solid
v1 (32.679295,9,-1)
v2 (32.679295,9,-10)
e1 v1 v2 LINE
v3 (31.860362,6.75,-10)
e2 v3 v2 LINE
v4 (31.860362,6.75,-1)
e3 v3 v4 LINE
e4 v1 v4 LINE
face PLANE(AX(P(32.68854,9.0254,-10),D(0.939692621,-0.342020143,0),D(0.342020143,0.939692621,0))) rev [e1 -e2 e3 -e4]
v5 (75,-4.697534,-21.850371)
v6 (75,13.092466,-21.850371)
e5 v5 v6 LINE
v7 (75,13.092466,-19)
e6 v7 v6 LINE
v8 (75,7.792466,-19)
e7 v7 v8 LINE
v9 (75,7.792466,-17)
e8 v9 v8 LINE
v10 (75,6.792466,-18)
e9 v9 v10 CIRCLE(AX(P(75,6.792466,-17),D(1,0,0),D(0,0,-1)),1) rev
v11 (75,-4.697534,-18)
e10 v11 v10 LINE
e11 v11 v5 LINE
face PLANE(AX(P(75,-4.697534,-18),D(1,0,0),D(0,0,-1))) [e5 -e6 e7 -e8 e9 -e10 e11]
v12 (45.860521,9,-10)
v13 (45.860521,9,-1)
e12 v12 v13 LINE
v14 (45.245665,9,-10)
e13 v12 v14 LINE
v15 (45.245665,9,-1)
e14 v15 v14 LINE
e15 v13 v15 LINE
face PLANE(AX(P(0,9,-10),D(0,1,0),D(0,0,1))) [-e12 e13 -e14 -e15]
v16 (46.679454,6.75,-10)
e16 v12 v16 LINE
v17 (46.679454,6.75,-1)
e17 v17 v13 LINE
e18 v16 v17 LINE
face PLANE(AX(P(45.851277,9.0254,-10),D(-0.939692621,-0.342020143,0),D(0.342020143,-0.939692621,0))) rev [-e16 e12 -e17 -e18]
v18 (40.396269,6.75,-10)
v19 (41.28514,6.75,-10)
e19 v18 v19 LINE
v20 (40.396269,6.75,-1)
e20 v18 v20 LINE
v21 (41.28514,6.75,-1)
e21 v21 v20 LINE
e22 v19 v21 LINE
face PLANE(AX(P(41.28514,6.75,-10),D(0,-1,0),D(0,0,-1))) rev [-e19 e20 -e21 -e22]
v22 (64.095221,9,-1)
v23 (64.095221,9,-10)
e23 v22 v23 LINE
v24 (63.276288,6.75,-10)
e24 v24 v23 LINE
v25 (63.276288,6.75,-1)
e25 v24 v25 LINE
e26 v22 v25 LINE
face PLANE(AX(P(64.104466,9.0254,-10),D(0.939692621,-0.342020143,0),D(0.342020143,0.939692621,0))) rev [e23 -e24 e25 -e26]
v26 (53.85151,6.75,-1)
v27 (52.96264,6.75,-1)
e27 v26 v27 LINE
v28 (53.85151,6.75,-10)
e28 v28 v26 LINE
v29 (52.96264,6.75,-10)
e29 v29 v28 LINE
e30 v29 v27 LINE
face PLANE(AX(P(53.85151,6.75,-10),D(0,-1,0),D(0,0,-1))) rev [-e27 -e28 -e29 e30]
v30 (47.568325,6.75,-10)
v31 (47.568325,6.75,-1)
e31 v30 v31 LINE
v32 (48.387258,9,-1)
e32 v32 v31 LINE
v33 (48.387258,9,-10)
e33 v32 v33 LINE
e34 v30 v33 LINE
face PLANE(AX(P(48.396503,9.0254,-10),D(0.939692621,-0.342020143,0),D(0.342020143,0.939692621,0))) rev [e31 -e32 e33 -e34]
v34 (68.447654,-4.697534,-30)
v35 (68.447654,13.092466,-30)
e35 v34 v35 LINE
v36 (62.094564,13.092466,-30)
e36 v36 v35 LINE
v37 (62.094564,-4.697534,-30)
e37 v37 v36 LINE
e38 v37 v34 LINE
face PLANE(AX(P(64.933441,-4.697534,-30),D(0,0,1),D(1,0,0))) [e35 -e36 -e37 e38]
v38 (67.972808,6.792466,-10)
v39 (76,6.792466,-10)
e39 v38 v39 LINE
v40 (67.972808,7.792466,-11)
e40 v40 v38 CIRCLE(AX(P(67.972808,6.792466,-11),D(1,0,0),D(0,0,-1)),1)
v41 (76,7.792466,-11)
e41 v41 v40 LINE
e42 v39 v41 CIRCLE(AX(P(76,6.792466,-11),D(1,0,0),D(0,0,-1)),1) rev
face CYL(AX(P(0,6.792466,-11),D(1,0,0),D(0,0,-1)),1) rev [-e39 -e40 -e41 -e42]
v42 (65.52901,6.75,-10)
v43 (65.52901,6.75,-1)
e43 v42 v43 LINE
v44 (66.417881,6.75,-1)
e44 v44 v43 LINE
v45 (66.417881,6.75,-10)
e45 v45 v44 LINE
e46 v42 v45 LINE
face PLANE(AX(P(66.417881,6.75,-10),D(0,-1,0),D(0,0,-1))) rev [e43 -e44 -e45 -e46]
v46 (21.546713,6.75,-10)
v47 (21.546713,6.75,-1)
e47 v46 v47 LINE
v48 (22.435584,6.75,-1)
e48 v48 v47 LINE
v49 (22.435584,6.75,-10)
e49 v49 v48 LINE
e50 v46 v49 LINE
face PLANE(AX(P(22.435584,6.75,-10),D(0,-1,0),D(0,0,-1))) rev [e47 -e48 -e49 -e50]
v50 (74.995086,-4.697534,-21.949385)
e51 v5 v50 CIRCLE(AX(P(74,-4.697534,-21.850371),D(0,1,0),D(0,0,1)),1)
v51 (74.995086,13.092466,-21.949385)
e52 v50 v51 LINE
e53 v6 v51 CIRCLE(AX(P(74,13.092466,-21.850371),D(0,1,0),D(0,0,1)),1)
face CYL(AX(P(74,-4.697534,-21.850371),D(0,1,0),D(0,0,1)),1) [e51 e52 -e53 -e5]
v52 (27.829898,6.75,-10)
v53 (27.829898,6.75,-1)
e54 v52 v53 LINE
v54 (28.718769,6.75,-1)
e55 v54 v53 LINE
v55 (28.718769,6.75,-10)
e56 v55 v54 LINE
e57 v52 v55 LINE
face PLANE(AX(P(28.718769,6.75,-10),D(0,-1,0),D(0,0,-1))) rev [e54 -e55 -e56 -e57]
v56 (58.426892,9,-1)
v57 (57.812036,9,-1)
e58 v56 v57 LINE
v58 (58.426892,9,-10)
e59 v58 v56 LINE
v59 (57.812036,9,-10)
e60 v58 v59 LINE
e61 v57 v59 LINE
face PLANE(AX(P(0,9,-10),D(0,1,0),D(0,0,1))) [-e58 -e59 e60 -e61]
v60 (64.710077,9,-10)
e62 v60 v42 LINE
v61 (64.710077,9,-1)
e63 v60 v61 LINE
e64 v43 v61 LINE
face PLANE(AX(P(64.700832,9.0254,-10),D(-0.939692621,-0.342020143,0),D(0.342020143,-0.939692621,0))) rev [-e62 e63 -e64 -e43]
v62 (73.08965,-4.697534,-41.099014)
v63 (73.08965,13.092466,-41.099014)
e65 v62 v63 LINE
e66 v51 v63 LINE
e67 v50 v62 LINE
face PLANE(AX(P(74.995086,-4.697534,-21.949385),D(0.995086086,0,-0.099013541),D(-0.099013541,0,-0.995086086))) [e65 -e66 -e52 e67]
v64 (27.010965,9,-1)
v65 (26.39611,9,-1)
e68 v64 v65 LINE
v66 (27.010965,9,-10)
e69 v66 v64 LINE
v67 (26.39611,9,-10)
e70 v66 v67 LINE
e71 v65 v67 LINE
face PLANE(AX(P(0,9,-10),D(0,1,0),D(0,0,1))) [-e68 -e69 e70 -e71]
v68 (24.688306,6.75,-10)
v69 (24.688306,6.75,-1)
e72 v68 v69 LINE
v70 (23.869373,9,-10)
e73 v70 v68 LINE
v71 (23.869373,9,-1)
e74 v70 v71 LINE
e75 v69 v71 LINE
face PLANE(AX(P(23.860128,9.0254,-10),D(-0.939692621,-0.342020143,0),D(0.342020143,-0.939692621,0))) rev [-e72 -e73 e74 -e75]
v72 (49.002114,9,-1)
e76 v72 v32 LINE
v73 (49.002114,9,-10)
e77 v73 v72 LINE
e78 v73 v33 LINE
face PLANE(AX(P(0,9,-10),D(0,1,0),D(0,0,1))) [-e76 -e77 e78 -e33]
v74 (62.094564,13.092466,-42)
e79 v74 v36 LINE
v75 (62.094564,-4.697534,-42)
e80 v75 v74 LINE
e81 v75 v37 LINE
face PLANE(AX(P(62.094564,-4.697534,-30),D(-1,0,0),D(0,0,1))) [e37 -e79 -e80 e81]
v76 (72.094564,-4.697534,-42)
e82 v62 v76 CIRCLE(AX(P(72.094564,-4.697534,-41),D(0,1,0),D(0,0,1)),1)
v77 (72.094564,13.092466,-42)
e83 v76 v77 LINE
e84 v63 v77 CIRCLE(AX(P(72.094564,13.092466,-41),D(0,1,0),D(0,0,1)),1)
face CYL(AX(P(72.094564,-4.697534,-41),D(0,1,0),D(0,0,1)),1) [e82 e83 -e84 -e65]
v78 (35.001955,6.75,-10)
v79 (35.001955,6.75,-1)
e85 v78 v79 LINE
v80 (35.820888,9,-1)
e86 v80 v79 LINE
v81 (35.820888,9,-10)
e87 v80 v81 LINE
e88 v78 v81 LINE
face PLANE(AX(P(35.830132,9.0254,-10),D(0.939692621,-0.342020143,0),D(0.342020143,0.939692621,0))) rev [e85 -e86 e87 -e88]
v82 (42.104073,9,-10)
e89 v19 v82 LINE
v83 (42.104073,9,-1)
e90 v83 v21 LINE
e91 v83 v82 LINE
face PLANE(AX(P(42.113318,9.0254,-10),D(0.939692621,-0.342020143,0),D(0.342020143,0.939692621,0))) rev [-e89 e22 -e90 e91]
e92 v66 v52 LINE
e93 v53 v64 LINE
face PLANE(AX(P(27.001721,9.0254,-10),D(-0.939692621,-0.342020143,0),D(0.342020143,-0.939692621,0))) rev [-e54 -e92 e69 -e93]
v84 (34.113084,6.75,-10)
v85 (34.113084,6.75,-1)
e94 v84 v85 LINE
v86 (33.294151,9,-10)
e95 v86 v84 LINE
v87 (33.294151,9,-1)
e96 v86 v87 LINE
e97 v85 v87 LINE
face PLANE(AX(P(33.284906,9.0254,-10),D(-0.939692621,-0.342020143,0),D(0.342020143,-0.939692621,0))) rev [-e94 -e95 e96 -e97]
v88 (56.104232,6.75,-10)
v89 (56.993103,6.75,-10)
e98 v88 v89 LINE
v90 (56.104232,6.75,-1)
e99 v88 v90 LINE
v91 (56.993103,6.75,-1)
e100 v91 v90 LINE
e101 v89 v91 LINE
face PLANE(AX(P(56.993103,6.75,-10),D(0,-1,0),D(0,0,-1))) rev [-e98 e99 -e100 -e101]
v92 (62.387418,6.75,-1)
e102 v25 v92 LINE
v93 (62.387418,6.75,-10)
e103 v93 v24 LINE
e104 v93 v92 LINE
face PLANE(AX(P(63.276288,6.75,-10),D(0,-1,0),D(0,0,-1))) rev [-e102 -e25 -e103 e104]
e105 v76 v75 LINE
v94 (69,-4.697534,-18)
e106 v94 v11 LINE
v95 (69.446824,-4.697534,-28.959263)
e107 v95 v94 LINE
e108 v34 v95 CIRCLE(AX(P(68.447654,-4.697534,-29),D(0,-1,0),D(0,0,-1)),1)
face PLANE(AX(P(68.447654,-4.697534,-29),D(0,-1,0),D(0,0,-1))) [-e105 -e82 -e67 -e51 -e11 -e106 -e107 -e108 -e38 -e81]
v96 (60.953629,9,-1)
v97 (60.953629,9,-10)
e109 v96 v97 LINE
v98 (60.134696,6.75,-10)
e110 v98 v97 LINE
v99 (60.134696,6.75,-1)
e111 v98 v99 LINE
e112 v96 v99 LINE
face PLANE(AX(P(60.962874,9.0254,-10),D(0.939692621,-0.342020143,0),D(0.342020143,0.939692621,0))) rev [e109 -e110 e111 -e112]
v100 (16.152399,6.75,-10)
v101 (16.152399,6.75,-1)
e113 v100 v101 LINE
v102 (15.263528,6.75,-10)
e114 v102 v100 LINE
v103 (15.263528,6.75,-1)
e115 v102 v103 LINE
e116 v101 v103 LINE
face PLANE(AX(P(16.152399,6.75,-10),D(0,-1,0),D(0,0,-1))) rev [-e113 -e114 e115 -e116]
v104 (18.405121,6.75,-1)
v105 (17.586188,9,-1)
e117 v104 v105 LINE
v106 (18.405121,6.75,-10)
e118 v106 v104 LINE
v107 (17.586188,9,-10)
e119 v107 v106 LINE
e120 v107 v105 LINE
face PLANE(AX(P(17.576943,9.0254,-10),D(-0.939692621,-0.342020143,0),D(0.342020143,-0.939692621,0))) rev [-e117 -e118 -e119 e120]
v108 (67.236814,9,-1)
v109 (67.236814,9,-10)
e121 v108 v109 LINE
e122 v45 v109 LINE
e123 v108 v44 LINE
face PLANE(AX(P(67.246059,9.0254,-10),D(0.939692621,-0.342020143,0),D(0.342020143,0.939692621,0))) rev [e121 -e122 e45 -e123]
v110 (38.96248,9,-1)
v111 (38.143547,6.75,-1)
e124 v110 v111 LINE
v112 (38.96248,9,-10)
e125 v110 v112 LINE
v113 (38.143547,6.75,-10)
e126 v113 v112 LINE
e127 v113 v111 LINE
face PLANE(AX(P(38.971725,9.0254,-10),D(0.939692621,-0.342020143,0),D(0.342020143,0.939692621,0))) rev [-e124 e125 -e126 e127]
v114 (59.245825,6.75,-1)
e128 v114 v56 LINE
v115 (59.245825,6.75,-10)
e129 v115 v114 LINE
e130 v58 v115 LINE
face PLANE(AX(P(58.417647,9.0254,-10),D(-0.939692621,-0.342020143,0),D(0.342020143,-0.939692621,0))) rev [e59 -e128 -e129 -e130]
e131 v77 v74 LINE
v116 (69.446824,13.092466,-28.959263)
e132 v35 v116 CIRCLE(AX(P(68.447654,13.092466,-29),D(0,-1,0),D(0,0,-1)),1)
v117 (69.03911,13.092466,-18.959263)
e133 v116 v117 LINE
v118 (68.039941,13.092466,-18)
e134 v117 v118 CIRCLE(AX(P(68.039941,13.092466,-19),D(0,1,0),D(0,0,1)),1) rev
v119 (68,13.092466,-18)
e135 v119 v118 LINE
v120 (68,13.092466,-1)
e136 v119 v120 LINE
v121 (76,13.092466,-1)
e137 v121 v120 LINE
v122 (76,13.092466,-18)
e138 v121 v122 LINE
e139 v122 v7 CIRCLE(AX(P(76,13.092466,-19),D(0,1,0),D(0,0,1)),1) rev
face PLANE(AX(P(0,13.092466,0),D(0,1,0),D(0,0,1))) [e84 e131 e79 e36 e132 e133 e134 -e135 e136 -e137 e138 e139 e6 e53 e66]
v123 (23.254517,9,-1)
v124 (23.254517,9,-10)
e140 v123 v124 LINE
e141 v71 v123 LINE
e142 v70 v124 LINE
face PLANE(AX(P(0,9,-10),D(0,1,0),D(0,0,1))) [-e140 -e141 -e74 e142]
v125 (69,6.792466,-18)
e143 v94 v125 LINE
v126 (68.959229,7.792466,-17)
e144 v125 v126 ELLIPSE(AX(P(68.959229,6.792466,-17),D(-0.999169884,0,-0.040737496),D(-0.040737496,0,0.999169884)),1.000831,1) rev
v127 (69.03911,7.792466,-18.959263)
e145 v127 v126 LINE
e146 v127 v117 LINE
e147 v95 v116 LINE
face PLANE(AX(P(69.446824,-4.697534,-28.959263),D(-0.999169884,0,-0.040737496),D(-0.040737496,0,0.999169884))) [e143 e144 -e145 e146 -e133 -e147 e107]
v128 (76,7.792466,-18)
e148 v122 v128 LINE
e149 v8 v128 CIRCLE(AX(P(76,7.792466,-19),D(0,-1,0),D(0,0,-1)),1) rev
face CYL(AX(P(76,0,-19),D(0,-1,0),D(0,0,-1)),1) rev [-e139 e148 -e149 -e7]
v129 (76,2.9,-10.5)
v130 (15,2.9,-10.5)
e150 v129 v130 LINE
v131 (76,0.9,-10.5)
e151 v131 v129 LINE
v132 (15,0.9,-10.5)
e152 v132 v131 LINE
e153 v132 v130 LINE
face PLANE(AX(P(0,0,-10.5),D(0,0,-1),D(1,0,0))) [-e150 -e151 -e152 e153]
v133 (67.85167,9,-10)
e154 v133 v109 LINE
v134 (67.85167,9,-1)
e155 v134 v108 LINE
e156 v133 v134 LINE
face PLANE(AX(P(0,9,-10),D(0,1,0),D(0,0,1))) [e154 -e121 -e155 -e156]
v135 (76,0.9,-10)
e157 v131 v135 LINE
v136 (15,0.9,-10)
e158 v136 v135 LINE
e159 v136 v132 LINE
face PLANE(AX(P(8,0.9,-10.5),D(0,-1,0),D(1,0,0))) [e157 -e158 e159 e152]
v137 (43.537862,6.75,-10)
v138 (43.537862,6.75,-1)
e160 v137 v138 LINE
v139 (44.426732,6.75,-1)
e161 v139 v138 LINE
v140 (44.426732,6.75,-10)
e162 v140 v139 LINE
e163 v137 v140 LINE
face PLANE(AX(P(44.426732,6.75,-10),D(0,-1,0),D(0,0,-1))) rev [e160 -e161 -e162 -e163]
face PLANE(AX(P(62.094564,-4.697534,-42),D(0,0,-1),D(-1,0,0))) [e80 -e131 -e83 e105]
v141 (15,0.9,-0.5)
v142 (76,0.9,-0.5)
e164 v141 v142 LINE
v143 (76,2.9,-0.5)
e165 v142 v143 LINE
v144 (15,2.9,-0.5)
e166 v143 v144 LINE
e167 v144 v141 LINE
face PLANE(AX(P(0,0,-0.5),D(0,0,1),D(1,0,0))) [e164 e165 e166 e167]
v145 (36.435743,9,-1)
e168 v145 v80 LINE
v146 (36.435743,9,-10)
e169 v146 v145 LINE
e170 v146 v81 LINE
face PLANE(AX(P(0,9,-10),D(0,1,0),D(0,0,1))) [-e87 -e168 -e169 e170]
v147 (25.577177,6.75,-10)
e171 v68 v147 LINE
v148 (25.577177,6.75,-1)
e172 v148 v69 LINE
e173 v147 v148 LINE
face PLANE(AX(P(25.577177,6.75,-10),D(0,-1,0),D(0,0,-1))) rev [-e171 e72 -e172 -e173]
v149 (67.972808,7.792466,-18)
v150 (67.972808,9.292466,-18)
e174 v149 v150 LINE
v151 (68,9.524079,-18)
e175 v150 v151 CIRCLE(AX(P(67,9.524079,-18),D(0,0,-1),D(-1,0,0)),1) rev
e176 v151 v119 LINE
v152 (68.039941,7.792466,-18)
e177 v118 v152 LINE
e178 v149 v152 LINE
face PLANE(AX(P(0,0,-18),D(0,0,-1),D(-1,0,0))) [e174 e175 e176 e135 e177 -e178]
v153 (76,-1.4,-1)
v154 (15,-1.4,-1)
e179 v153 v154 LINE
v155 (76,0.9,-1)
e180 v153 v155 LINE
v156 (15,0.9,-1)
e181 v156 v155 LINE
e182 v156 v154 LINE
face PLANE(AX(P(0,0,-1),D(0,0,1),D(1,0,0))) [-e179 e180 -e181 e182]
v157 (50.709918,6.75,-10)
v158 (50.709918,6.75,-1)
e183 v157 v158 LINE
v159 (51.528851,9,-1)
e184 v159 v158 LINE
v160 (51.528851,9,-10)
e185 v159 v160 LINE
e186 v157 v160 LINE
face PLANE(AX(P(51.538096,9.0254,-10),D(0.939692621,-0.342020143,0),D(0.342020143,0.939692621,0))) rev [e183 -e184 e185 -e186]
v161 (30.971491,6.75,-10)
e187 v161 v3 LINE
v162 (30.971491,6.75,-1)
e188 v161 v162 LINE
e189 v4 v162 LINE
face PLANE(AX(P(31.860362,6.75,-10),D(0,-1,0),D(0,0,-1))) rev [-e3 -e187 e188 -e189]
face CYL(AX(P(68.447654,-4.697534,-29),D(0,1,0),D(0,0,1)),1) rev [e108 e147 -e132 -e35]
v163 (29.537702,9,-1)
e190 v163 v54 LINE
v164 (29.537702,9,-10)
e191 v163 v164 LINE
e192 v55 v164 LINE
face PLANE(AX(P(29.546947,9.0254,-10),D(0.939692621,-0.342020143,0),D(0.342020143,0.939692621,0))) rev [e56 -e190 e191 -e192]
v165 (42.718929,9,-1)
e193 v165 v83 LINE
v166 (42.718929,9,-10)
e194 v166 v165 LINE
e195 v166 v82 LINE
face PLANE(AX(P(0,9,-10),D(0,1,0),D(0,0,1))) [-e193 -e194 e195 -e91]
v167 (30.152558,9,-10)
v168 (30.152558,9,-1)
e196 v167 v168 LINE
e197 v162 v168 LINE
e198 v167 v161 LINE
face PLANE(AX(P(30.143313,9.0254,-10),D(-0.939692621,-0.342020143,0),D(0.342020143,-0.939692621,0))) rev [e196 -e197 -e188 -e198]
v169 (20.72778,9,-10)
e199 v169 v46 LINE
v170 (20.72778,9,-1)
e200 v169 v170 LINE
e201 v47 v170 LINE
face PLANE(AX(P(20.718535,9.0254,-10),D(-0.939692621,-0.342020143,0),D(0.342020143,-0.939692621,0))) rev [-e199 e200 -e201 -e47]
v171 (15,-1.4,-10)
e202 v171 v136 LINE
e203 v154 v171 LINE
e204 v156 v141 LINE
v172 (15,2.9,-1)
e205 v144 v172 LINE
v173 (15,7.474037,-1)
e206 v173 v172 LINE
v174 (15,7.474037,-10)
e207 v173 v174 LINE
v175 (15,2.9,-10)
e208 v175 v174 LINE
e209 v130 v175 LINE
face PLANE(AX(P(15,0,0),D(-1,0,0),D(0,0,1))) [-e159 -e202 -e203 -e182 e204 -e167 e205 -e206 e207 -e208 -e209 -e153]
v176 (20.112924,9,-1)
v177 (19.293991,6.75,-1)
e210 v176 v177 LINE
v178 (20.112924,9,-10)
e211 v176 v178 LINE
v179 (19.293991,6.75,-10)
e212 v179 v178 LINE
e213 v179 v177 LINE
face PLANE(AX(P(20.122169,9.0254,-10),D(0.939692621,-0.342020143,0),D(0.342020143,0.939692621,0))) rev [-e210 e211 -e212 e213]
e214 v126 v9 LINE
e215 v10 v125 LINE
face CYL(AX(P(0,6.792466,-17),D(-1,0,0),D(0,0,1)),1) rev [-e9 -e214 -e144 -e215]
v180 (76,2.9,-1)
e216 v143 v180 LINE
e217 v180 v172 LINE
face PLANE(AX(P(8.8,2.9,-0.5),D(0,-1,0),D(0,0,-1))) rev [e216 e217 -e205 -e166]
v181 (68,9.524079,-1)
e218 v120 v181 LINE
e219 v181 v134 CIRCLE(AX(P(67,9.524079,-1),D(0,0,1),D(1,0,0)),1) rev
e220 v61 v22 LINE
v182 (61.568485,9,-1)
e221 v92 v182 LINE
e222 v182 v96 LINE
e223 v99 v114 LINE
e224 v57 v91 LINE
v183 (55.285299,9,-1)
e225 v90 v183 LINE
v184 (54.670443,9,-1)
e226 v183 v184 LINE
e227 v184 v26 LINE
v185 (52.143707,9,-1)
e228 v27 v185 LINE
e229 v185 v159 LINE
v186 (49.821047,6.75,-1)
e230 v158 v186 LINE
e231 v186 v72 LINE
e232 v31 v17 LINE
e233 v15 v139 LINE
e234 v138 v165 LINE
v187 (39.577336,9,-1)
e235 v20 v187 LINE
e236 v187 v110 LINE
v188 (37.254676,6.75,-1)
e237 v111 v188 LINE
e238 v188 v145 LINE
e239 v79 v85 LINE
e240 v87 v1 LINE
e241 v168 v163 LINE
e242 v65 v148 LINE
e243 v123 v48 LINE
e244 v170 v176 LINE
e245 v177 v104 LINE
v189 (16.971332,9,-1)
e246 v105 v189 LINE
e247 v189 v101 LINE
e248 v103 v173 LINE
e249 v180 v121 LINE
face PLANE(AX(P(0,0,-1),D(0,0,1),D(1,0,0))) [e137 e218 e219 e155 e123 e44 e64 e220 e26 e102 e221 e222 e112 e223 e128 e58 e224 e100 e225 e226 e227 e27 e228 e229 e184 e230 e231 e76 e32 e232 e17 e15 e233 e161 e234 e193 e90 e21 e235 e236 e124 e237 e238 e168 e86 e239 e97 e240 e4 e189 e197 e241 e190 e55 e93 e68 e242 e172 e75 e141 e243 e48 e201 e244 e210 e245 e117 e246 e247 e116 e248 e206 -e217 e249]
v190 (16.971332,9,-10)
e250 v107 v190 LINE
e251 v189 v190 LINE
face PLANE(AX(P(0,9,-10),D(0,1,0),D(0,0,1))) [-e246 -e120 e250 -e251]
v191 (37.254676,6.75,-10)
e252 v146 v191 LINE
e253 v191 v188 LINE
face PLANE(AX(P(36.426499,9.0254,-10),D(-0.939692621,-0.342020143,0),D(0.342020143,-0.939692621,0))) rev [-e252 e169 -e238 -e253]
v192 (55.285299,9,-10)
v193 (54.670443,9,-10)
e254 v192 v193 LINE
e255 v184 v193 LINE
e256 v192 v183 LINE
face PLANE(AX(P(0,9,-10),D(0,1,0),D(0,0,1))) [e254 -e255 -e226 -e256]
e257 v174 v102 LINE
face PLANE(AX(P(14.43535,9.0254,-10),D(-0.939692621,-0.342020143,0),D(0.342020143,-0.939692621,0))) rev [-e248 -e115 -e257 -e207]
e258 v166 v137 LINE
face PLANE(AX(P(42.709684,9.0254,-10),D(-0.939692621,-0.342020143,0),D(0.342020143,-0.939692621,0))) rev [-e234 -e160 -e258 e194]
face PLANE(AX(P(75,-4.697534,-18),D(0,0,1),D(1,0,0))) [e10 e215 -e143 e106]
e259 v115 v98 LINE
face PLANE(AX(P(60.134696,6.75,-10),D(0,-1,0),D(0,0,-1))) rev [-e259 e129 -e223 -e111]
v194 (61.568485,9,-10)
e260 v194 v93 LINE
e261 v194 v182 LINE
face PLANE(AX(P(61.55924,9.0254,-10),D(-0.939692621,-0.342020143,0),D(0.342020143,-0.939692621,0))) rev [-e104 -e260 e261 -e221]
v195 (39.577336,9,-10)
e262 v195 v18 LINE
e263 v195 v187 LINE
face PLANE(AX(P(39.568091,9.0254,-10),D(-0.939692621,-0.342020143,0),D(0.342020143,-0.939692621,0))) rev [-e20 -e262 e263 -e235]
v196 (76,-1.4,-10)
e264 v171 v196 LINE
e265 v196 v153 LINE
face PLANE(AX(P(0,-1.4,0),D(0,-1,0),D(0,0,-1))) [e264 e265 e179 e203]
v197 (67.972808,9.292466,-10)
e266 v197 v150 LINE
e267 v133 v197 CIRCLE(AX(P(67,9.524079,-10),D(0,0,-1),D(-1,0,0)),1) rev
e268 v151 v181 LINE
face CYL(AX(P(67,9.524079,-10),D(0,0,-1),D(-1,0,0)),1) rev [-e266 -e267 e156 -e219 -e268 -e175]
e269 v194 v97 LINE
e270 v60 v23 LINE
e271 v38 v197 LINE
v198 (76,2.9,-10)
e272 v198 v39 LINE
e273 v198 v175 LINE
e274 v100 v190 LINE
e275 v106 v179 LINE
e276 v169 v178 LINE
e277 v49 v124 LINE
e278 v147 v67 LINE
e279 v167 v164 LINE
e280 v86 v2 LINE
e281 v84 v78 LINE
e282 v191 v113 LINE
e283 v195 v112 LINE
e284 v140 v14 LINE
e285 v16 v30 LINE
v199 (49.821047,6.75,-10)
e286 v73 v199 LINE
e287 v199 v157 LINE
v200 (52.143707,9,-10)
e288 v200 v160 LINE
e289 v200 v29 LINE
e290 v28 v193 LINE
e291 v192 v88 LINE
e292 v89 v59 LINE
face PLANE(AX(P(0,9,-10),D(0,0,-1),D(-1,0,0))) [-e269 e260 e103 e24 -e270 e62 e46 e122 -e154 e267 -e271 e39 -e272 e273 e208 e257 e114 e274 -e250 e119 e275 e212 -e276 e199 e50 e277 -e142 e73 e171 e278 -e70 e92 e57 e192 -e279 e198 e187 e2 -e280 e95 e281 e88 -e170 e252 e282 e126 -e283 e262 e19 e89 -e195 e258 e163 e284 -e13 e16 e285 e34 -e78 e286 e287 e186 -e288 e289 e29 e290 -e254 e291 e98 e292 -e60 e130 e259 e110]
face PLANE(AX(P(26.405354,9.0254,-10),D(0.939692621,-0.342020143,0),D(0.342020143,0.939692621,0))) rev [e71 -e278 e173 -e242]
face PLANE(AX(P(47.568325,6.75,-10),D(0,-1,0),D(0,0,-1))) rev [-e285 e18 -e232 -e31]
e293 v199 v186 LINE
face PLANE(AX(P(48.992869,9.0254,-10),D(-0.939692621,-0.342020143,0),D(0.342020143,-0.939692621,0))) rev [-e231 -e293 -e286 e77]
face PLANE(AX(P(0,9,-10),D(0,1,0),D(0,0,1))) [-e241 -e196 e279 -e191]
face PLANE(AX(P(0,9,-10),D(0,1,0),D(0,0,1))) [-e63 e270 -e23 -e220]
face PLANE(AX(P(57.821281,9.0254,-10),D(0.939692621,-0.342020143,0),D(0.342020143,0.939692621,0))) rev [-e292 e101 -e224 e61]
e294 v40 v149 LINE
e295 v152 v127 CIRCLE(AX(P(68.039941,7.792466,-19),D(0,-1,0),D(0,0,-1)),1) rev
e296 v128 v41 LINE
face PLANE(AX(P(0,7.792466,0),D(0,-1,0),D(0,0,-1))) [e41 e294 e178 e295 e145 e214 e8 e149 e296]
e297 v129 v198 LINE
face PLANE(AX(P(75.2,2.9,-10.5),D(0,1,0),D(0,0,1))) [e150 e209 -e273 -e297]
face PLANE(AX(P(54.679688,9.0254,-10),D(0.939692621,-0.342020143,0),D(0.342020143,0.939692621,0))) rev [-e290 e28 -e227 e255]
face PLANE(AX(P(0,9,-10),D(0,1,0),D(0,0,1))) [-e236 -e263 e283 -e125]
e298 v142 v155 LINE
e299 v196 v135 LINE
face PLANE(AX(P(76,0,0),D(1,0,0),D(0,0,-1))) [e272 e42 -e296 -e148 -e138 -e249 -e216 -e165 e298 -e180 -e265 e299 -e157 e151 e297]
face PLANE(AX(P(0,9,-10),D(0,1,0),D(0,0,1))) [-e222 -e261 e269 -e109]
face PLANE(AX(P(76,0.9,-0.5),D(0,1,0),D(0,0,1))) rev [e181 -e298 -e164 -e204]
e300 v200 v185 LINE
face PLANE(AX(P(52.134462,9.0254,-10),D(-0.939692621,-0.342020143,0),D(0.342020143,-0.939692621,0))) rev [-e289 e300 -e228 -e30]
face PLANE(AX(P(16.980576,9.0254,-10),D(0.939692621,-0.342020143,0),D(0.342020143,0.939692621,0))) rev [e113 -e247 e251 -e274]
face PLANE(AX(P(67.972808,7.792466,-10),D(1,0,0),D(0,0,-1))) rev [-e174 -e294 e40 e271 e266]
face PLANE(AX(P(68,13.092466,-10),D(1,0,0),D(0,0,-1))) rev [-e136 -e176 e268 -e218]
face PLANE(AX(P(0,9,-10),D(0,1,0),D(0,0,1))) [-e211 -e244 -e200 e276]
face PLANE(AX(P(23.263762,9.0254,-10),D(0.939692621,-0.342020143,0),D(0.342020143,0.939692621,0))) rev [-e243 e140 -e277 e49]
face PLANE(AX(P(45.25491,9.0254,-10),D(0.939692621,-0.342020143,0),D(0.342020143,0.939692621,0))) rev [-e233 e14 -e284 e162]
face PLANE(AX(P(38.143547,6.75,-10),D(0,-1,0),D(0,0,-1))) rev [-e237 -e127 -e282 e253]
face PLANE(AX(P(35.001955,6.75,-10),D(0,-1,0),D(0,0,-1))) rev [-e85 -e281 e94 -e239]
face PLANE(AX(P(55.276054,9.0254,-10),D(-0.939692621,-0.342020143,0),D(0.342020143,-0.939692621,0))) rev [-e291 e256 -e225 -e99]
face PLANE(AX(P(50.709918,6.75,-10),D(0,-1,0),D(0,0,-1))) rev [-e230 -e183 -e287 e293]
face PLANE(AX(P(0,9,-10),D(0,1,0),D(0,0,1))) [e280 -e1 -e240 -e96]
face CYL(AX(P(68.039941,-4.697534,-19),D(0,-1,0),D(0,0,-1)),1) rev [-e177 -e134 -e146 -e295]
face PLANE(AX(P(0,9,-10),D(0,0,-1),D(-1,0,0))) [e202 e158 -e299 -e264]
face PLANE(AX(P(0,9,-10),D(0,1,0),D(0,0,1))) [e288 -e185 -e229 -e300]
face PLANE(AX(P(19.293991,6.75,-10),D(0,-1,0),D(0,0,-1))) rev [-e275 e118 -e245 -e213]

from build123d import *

# Parameters (mm, degrees)
BLANKSKE_W           = 68
BLANKSKE_H           = 9
BLANK_DEPTH          = 10
TOOTHCUTSIM_DEPTH    = 70.318107302
TEETHCUTS_COUNT      = 23
TEETHCUTS_PITCH      = 3.14159265
SKETCH1_W            = 10
SKETCH1_H            = 8.592466409
BOSS_EXTRUDE1_DEPTH  = 8
SKETCH3_W            = 8
SKETCH3_H            = 10
BOSS_EXTRUDE2_DEPTH  = 4.5
SKETCH4_W            = 8
SKETCH4_H            = 3.8
BOSS_EXTRUDE3_DEPTH  = 8
SKETCH5_W            = 10
SKETCH5_H            = 11.170580006
CUT_EXTRUDE1_DEPTH   = 8
CUT_EXTRUDE2_DEPTH   = 1
BOSS_EXTRUDE5_DEPTH  = 0.5
FILLET8_START        = -10
FILLET8_DEPTH        = 9
FILLET8_START_2      = -18
FILLET8_2_DEPTH      = 8.45342
BOSS_EXTRUDE6_DEPTH  = 17.79
BOSS_EXTRUDE10_DEPTH = 1.5
FILLET15_R           = 1
SKETCH11_W           = 15.24537785
SKETCH11_H           = 13.543744844
CUT_EXTRUDE3_DEPTH   = 7
SKETCH16_W           = 61
SKETCH16_H           = 9
BOSS_EXTRUDE12_DEPTH = 1.4
FILLET19_R           = 1


with BuildPart() as part:
    # BlankSke → Blank (new body)
    with BuildSketch(Plane.XY):
        with Locations((34, 4.5)):
            Rectangle(BLANKSKE_W, BLANKSKE_H)
    extrude(amount=-BLANK_DEPTH)

    # TooCutSkeSim → ToothCutSim (cut, through all)
    with BuildSketch(Plane.XY):
        Polygon((0.44443537, 6.75), (-0.44443537, 6.75), (-1.272613241, 9.0254), (1.272613241, 9.0254), align=None)
    toothcutsim = extrude(amount=-TOOTHCUTSIM_DEPTH, mode=Mode.SUBTRACT)

    # TeethCuts: ToothCutSim ×23
    with Locations(*[(i * TEETHCUTS_PITCH, 0, 0) for i in range(1, TEETHCUTS_COUNT)]):
        add(toothcutsim, mode=Mode.SUBTRACT)

    # Sketch1 → Boss-Extrude1 (add)
    with BuildSketch(Plane(origin=(68, 0, 0), x_dir=(0, 0, -1), z_dir=(1, 0, 0))):
        with Locations((5, 4.296233205)):
            Rectangle(SKETCH1_W, SKETCH1_H)
    extrude(amount=BOSS_EXTRUDE1_DEPTH)

    # Sketch3 → Boss-Extrude2 (add)
    with BuildSketch(Plane(origin=(0, 8.592466409, 0), x_dir=(1, 0, 0), z_dir=(0, 1, 0))):
        with Locations((72, 5)):
            Rectangle(SKETCH3_W, SKETCH3_H)
    extrude(amount=BOSS_EXTRUDE2_DEPTH)

    # Sketch4 → Boss-Extrude3 (add)
    with BuildSketch(Plane(origin=(0, 0, -10), x_dir=(-1, 0, 0), z_dir=(0, 0, -1))):
        with Locations((-72, 11.192466409)):
            Rectangle(SKETCH4_W, SKETCH4_H)
    extrude(amount=BOSS_EXTRUDE3_DEPTH)

    # Sketch5 → Cut-Extrude1 (cut)
    with BuildSketch(Plane.ZY):
        with Locations((-5, 5.585290003)):
            Rectangle(SKETCH5_W, SKETCH5_H)
    extrude(amount=-CUT_EXTRUDE1_DEPTH, mode=Mode.SUBTRACT)

    # Sketch6 → Cut-Extrude2 (cut)
    with BuildSketch(Plane.XY):
        Polygon((8.161409553, 9), (8, 9), (8, 0), (76, 0), (76, 13.092466409), (68, 13.092466409), (68, 8.592466409), (67.851669903, 9), (67.236814047, 9), (66.41788102, 6.75), (65.52901028, 6.75), (64.710077253, 9), (64.095221397, 9), (63.27628837, 6.75), (62.38741763, 6.75), (61.568484603, 9), (60.953628747, 9), (60.13469572, 6.75), (59.24582498, 6.75), (58.426891953, 9), (57.812036097, 9), (56.99310307, 6.75), (56.10423233, 6.75), (55.285299303, 9), (54.670443447, 9), (53.85151042, 6.75), (52.96263968, 6.75), (52.143706653, 9), (51.528850797, 9), (50.70991777, 6.75), (49.82104703, 6.75), (49.002114003, 9), (48.387258147, 9), (47.56832512, 6.75), (46.67945438, 6.75), (45.860521353, 9), (45.245665497, 9), (44.42673247, 6.75), (43.53786173, 6.75), (42.718928703, 9), (42.104072847, 9), (41.28513982, 6.75), (40.39626908, 6.75), (39.577336053, 9), (38.962480197, 9), (38.14354717, 6.75), (37.25467643, 6.75), (36.435743403, 9), (35.820887547, 9), (35.00195452, 6.75), (34.11308378, 6.75), (33.294150753, 9), (32.679294897, 9), (31.86036187, 6.75), (30.97149113, 6.75), (30.152558103, 9), (29.537702247, 9), (28.71876922, 6.75), (27.82989848, 6.75), (27.010965453, 9), (26.396109597, 9), (25.57717657, 6.75), (24.68830583, 6.75), (23.869372803, 9), (23.254516947, 9), (22.43558392, 6.75), (21.54671318, 6.75), (20.727780153, 9), (20.112924297, 9), (19.29399127, 6.75), (18.40512053, 6.75), (17.586187503, 9), (16.971331647, 9), (16.15239862, 6.75), (15.26352788, 6.75), (14.444594853, 9), (13.829738997, 9), (13.01080597, 6.75), (12.12193523, 6.75), (11.303002203, 9), (10.688146347, 9), (9.86921332, 6.75), (8.98034258, 6.75), align=None)
    extrude(amount=-CUT_EXTRUDE2_DEPTH, mode=Mode.SUBTRACT)

    # Sketch7 → Boss-Extrude5 (add)
    with BuildSketch(Plane.XY.offset(-1)):
        Polygon((8.8, 0.9), (75.2, 0.9), (76, 0.9), (76, 2.9), (75.2, 2.9), (8.8, 2.9), (8, 2.9), (8, 0.9), align=None)
    boss_extrude5 = extrude(amount=BOSS_EXTRUDE5_DEPTH)

    # Mirror3: Boss-Extrude5 across plane
    add(boss_extrude5.mirror(Plane.XY.offset(-5.5)))

    # Fillet8: read off the stored shape, not the designer's step
    # Fillet8 outline → Fillet8 (add)
    with BuildSketch(Plane.XY.offset(FILLET8_START)):
        with BuildLine():
            ThreePointArc((68, 9.524078597), (67.962203176, 9.251745991), (67.851669903, 9))
            Line((67.851669903, 9), (68, 8.592466409))
            Line((68, 8.592466409), (68, 9.524078597))
        make_face()
    extrude(amount=FILLET8_DEPTH)

    # Fillet8 2 outline → Fillet8 2 (add)
    with BuildSketch(Plane.XY.offset(FILLET8_START_2)):
        with BuildLine():
            Line((68, 9.292466409), (68, 9.524078597))
            ThreePointArc((68, 9.524078597), (67.993178786, 9.407477139), (67.9728082, 9.292466409))
            Line((67.9728082, 9.292466409), (68, 9.292466409))
        make_face()
    extrude(amount=FILLET8_2_DEPTH)

    # Sketch8 → Boss-Extrude6 (add)
    with BuildSketch(Plane(origin=(0, 13.092466409, 0), x_dir=(1, 0, 0), z_dir=(0, 1, 0))):
        with BuildLine():
            Line((75, 18), (75, 21.850371294))
            ThreePointArc((75, 21.850371294), (74.998770766, 21.899938995), (74.995086086, 21.949384835))
            Line((74.995086086, 21.949384835), (73.089650394, 41.099013541))
            ThreePointArc((73.089650394, 41.099013541), (72.765752232, 41.741287239), (72.094564308, 42))
            Line((72.094564308, 42), (62.094564308, 42))
            Line((62.094564308, 42), (62.094564308, 30))
            Line((62.094564308, 30), (64.933441114, 30))
            Line((64.933441114, 30), (68.447653948, 30))
            ThreePointArc((68.447653948, 30), (69.169019838, 29.692554151), (69.446823832, 28.959262504))
            Line((69.446823832, 28.959262504), (69, 18))
            Line((69, 18), (75, 18))
        make_face()
    extrude(amount=-BOSS_EXTRUDE6_DEPTH)

    # Sketch14 → Boss-Extrude10 (add)
    with BuildSketch(Plane.XZ.offset(-9.292466409)):
        Polygon((76, -10), (67.9728082, -10), (67.9728082, -18), (69, -18), (75, -18), (76, -18), align=None)
    extrude(amount=BOSS_EXTRUDE10_DEPTH)

    # Fillet15
    fillet15_edges = [part.edges().sort_by_distance(p)[0] for p in [
        (71.9864041, 7.792466409, -10),
        (72, 7.792466409, -18),
    ]]
    fillet(fillet15_edges, radius=FILLET15_R)

    # Sketch11 → Cut-Extrude3 (cut)
    with BuildSketch(Plane.ZY.offset(-8)):
        with Locations((-5.226368624, 3.937583059)):
            Rectangle(SKETCH11_W, SKETCH11_H)
    extrude(amount=-CUT_EXTRUDE3_DEPTH, mode=Mode.SUBTRACT)

    # Sketch16 → Boss-Extrude12 (add)
    with BuildSketch(Plane.XZ):
        with Locations((45.5, -5.5)):
            Rectangle(SKETCH16_W, SKETCH16_H)
    extrude(amount=BOSS_EXTRUDE12_DEPTH)

    # Fillet19
    fillet19_edges = [part.edges().sort_by_distance(p)[0] for p in [
        (75, 10.442466409, -18),
        (69, 10.442466409, -18),
    ]]
    fillet(fillet19_edges, radius=FILLET19_R - 0.0001)  # a hair under: the kernel refuses the full size


solid = part.part
